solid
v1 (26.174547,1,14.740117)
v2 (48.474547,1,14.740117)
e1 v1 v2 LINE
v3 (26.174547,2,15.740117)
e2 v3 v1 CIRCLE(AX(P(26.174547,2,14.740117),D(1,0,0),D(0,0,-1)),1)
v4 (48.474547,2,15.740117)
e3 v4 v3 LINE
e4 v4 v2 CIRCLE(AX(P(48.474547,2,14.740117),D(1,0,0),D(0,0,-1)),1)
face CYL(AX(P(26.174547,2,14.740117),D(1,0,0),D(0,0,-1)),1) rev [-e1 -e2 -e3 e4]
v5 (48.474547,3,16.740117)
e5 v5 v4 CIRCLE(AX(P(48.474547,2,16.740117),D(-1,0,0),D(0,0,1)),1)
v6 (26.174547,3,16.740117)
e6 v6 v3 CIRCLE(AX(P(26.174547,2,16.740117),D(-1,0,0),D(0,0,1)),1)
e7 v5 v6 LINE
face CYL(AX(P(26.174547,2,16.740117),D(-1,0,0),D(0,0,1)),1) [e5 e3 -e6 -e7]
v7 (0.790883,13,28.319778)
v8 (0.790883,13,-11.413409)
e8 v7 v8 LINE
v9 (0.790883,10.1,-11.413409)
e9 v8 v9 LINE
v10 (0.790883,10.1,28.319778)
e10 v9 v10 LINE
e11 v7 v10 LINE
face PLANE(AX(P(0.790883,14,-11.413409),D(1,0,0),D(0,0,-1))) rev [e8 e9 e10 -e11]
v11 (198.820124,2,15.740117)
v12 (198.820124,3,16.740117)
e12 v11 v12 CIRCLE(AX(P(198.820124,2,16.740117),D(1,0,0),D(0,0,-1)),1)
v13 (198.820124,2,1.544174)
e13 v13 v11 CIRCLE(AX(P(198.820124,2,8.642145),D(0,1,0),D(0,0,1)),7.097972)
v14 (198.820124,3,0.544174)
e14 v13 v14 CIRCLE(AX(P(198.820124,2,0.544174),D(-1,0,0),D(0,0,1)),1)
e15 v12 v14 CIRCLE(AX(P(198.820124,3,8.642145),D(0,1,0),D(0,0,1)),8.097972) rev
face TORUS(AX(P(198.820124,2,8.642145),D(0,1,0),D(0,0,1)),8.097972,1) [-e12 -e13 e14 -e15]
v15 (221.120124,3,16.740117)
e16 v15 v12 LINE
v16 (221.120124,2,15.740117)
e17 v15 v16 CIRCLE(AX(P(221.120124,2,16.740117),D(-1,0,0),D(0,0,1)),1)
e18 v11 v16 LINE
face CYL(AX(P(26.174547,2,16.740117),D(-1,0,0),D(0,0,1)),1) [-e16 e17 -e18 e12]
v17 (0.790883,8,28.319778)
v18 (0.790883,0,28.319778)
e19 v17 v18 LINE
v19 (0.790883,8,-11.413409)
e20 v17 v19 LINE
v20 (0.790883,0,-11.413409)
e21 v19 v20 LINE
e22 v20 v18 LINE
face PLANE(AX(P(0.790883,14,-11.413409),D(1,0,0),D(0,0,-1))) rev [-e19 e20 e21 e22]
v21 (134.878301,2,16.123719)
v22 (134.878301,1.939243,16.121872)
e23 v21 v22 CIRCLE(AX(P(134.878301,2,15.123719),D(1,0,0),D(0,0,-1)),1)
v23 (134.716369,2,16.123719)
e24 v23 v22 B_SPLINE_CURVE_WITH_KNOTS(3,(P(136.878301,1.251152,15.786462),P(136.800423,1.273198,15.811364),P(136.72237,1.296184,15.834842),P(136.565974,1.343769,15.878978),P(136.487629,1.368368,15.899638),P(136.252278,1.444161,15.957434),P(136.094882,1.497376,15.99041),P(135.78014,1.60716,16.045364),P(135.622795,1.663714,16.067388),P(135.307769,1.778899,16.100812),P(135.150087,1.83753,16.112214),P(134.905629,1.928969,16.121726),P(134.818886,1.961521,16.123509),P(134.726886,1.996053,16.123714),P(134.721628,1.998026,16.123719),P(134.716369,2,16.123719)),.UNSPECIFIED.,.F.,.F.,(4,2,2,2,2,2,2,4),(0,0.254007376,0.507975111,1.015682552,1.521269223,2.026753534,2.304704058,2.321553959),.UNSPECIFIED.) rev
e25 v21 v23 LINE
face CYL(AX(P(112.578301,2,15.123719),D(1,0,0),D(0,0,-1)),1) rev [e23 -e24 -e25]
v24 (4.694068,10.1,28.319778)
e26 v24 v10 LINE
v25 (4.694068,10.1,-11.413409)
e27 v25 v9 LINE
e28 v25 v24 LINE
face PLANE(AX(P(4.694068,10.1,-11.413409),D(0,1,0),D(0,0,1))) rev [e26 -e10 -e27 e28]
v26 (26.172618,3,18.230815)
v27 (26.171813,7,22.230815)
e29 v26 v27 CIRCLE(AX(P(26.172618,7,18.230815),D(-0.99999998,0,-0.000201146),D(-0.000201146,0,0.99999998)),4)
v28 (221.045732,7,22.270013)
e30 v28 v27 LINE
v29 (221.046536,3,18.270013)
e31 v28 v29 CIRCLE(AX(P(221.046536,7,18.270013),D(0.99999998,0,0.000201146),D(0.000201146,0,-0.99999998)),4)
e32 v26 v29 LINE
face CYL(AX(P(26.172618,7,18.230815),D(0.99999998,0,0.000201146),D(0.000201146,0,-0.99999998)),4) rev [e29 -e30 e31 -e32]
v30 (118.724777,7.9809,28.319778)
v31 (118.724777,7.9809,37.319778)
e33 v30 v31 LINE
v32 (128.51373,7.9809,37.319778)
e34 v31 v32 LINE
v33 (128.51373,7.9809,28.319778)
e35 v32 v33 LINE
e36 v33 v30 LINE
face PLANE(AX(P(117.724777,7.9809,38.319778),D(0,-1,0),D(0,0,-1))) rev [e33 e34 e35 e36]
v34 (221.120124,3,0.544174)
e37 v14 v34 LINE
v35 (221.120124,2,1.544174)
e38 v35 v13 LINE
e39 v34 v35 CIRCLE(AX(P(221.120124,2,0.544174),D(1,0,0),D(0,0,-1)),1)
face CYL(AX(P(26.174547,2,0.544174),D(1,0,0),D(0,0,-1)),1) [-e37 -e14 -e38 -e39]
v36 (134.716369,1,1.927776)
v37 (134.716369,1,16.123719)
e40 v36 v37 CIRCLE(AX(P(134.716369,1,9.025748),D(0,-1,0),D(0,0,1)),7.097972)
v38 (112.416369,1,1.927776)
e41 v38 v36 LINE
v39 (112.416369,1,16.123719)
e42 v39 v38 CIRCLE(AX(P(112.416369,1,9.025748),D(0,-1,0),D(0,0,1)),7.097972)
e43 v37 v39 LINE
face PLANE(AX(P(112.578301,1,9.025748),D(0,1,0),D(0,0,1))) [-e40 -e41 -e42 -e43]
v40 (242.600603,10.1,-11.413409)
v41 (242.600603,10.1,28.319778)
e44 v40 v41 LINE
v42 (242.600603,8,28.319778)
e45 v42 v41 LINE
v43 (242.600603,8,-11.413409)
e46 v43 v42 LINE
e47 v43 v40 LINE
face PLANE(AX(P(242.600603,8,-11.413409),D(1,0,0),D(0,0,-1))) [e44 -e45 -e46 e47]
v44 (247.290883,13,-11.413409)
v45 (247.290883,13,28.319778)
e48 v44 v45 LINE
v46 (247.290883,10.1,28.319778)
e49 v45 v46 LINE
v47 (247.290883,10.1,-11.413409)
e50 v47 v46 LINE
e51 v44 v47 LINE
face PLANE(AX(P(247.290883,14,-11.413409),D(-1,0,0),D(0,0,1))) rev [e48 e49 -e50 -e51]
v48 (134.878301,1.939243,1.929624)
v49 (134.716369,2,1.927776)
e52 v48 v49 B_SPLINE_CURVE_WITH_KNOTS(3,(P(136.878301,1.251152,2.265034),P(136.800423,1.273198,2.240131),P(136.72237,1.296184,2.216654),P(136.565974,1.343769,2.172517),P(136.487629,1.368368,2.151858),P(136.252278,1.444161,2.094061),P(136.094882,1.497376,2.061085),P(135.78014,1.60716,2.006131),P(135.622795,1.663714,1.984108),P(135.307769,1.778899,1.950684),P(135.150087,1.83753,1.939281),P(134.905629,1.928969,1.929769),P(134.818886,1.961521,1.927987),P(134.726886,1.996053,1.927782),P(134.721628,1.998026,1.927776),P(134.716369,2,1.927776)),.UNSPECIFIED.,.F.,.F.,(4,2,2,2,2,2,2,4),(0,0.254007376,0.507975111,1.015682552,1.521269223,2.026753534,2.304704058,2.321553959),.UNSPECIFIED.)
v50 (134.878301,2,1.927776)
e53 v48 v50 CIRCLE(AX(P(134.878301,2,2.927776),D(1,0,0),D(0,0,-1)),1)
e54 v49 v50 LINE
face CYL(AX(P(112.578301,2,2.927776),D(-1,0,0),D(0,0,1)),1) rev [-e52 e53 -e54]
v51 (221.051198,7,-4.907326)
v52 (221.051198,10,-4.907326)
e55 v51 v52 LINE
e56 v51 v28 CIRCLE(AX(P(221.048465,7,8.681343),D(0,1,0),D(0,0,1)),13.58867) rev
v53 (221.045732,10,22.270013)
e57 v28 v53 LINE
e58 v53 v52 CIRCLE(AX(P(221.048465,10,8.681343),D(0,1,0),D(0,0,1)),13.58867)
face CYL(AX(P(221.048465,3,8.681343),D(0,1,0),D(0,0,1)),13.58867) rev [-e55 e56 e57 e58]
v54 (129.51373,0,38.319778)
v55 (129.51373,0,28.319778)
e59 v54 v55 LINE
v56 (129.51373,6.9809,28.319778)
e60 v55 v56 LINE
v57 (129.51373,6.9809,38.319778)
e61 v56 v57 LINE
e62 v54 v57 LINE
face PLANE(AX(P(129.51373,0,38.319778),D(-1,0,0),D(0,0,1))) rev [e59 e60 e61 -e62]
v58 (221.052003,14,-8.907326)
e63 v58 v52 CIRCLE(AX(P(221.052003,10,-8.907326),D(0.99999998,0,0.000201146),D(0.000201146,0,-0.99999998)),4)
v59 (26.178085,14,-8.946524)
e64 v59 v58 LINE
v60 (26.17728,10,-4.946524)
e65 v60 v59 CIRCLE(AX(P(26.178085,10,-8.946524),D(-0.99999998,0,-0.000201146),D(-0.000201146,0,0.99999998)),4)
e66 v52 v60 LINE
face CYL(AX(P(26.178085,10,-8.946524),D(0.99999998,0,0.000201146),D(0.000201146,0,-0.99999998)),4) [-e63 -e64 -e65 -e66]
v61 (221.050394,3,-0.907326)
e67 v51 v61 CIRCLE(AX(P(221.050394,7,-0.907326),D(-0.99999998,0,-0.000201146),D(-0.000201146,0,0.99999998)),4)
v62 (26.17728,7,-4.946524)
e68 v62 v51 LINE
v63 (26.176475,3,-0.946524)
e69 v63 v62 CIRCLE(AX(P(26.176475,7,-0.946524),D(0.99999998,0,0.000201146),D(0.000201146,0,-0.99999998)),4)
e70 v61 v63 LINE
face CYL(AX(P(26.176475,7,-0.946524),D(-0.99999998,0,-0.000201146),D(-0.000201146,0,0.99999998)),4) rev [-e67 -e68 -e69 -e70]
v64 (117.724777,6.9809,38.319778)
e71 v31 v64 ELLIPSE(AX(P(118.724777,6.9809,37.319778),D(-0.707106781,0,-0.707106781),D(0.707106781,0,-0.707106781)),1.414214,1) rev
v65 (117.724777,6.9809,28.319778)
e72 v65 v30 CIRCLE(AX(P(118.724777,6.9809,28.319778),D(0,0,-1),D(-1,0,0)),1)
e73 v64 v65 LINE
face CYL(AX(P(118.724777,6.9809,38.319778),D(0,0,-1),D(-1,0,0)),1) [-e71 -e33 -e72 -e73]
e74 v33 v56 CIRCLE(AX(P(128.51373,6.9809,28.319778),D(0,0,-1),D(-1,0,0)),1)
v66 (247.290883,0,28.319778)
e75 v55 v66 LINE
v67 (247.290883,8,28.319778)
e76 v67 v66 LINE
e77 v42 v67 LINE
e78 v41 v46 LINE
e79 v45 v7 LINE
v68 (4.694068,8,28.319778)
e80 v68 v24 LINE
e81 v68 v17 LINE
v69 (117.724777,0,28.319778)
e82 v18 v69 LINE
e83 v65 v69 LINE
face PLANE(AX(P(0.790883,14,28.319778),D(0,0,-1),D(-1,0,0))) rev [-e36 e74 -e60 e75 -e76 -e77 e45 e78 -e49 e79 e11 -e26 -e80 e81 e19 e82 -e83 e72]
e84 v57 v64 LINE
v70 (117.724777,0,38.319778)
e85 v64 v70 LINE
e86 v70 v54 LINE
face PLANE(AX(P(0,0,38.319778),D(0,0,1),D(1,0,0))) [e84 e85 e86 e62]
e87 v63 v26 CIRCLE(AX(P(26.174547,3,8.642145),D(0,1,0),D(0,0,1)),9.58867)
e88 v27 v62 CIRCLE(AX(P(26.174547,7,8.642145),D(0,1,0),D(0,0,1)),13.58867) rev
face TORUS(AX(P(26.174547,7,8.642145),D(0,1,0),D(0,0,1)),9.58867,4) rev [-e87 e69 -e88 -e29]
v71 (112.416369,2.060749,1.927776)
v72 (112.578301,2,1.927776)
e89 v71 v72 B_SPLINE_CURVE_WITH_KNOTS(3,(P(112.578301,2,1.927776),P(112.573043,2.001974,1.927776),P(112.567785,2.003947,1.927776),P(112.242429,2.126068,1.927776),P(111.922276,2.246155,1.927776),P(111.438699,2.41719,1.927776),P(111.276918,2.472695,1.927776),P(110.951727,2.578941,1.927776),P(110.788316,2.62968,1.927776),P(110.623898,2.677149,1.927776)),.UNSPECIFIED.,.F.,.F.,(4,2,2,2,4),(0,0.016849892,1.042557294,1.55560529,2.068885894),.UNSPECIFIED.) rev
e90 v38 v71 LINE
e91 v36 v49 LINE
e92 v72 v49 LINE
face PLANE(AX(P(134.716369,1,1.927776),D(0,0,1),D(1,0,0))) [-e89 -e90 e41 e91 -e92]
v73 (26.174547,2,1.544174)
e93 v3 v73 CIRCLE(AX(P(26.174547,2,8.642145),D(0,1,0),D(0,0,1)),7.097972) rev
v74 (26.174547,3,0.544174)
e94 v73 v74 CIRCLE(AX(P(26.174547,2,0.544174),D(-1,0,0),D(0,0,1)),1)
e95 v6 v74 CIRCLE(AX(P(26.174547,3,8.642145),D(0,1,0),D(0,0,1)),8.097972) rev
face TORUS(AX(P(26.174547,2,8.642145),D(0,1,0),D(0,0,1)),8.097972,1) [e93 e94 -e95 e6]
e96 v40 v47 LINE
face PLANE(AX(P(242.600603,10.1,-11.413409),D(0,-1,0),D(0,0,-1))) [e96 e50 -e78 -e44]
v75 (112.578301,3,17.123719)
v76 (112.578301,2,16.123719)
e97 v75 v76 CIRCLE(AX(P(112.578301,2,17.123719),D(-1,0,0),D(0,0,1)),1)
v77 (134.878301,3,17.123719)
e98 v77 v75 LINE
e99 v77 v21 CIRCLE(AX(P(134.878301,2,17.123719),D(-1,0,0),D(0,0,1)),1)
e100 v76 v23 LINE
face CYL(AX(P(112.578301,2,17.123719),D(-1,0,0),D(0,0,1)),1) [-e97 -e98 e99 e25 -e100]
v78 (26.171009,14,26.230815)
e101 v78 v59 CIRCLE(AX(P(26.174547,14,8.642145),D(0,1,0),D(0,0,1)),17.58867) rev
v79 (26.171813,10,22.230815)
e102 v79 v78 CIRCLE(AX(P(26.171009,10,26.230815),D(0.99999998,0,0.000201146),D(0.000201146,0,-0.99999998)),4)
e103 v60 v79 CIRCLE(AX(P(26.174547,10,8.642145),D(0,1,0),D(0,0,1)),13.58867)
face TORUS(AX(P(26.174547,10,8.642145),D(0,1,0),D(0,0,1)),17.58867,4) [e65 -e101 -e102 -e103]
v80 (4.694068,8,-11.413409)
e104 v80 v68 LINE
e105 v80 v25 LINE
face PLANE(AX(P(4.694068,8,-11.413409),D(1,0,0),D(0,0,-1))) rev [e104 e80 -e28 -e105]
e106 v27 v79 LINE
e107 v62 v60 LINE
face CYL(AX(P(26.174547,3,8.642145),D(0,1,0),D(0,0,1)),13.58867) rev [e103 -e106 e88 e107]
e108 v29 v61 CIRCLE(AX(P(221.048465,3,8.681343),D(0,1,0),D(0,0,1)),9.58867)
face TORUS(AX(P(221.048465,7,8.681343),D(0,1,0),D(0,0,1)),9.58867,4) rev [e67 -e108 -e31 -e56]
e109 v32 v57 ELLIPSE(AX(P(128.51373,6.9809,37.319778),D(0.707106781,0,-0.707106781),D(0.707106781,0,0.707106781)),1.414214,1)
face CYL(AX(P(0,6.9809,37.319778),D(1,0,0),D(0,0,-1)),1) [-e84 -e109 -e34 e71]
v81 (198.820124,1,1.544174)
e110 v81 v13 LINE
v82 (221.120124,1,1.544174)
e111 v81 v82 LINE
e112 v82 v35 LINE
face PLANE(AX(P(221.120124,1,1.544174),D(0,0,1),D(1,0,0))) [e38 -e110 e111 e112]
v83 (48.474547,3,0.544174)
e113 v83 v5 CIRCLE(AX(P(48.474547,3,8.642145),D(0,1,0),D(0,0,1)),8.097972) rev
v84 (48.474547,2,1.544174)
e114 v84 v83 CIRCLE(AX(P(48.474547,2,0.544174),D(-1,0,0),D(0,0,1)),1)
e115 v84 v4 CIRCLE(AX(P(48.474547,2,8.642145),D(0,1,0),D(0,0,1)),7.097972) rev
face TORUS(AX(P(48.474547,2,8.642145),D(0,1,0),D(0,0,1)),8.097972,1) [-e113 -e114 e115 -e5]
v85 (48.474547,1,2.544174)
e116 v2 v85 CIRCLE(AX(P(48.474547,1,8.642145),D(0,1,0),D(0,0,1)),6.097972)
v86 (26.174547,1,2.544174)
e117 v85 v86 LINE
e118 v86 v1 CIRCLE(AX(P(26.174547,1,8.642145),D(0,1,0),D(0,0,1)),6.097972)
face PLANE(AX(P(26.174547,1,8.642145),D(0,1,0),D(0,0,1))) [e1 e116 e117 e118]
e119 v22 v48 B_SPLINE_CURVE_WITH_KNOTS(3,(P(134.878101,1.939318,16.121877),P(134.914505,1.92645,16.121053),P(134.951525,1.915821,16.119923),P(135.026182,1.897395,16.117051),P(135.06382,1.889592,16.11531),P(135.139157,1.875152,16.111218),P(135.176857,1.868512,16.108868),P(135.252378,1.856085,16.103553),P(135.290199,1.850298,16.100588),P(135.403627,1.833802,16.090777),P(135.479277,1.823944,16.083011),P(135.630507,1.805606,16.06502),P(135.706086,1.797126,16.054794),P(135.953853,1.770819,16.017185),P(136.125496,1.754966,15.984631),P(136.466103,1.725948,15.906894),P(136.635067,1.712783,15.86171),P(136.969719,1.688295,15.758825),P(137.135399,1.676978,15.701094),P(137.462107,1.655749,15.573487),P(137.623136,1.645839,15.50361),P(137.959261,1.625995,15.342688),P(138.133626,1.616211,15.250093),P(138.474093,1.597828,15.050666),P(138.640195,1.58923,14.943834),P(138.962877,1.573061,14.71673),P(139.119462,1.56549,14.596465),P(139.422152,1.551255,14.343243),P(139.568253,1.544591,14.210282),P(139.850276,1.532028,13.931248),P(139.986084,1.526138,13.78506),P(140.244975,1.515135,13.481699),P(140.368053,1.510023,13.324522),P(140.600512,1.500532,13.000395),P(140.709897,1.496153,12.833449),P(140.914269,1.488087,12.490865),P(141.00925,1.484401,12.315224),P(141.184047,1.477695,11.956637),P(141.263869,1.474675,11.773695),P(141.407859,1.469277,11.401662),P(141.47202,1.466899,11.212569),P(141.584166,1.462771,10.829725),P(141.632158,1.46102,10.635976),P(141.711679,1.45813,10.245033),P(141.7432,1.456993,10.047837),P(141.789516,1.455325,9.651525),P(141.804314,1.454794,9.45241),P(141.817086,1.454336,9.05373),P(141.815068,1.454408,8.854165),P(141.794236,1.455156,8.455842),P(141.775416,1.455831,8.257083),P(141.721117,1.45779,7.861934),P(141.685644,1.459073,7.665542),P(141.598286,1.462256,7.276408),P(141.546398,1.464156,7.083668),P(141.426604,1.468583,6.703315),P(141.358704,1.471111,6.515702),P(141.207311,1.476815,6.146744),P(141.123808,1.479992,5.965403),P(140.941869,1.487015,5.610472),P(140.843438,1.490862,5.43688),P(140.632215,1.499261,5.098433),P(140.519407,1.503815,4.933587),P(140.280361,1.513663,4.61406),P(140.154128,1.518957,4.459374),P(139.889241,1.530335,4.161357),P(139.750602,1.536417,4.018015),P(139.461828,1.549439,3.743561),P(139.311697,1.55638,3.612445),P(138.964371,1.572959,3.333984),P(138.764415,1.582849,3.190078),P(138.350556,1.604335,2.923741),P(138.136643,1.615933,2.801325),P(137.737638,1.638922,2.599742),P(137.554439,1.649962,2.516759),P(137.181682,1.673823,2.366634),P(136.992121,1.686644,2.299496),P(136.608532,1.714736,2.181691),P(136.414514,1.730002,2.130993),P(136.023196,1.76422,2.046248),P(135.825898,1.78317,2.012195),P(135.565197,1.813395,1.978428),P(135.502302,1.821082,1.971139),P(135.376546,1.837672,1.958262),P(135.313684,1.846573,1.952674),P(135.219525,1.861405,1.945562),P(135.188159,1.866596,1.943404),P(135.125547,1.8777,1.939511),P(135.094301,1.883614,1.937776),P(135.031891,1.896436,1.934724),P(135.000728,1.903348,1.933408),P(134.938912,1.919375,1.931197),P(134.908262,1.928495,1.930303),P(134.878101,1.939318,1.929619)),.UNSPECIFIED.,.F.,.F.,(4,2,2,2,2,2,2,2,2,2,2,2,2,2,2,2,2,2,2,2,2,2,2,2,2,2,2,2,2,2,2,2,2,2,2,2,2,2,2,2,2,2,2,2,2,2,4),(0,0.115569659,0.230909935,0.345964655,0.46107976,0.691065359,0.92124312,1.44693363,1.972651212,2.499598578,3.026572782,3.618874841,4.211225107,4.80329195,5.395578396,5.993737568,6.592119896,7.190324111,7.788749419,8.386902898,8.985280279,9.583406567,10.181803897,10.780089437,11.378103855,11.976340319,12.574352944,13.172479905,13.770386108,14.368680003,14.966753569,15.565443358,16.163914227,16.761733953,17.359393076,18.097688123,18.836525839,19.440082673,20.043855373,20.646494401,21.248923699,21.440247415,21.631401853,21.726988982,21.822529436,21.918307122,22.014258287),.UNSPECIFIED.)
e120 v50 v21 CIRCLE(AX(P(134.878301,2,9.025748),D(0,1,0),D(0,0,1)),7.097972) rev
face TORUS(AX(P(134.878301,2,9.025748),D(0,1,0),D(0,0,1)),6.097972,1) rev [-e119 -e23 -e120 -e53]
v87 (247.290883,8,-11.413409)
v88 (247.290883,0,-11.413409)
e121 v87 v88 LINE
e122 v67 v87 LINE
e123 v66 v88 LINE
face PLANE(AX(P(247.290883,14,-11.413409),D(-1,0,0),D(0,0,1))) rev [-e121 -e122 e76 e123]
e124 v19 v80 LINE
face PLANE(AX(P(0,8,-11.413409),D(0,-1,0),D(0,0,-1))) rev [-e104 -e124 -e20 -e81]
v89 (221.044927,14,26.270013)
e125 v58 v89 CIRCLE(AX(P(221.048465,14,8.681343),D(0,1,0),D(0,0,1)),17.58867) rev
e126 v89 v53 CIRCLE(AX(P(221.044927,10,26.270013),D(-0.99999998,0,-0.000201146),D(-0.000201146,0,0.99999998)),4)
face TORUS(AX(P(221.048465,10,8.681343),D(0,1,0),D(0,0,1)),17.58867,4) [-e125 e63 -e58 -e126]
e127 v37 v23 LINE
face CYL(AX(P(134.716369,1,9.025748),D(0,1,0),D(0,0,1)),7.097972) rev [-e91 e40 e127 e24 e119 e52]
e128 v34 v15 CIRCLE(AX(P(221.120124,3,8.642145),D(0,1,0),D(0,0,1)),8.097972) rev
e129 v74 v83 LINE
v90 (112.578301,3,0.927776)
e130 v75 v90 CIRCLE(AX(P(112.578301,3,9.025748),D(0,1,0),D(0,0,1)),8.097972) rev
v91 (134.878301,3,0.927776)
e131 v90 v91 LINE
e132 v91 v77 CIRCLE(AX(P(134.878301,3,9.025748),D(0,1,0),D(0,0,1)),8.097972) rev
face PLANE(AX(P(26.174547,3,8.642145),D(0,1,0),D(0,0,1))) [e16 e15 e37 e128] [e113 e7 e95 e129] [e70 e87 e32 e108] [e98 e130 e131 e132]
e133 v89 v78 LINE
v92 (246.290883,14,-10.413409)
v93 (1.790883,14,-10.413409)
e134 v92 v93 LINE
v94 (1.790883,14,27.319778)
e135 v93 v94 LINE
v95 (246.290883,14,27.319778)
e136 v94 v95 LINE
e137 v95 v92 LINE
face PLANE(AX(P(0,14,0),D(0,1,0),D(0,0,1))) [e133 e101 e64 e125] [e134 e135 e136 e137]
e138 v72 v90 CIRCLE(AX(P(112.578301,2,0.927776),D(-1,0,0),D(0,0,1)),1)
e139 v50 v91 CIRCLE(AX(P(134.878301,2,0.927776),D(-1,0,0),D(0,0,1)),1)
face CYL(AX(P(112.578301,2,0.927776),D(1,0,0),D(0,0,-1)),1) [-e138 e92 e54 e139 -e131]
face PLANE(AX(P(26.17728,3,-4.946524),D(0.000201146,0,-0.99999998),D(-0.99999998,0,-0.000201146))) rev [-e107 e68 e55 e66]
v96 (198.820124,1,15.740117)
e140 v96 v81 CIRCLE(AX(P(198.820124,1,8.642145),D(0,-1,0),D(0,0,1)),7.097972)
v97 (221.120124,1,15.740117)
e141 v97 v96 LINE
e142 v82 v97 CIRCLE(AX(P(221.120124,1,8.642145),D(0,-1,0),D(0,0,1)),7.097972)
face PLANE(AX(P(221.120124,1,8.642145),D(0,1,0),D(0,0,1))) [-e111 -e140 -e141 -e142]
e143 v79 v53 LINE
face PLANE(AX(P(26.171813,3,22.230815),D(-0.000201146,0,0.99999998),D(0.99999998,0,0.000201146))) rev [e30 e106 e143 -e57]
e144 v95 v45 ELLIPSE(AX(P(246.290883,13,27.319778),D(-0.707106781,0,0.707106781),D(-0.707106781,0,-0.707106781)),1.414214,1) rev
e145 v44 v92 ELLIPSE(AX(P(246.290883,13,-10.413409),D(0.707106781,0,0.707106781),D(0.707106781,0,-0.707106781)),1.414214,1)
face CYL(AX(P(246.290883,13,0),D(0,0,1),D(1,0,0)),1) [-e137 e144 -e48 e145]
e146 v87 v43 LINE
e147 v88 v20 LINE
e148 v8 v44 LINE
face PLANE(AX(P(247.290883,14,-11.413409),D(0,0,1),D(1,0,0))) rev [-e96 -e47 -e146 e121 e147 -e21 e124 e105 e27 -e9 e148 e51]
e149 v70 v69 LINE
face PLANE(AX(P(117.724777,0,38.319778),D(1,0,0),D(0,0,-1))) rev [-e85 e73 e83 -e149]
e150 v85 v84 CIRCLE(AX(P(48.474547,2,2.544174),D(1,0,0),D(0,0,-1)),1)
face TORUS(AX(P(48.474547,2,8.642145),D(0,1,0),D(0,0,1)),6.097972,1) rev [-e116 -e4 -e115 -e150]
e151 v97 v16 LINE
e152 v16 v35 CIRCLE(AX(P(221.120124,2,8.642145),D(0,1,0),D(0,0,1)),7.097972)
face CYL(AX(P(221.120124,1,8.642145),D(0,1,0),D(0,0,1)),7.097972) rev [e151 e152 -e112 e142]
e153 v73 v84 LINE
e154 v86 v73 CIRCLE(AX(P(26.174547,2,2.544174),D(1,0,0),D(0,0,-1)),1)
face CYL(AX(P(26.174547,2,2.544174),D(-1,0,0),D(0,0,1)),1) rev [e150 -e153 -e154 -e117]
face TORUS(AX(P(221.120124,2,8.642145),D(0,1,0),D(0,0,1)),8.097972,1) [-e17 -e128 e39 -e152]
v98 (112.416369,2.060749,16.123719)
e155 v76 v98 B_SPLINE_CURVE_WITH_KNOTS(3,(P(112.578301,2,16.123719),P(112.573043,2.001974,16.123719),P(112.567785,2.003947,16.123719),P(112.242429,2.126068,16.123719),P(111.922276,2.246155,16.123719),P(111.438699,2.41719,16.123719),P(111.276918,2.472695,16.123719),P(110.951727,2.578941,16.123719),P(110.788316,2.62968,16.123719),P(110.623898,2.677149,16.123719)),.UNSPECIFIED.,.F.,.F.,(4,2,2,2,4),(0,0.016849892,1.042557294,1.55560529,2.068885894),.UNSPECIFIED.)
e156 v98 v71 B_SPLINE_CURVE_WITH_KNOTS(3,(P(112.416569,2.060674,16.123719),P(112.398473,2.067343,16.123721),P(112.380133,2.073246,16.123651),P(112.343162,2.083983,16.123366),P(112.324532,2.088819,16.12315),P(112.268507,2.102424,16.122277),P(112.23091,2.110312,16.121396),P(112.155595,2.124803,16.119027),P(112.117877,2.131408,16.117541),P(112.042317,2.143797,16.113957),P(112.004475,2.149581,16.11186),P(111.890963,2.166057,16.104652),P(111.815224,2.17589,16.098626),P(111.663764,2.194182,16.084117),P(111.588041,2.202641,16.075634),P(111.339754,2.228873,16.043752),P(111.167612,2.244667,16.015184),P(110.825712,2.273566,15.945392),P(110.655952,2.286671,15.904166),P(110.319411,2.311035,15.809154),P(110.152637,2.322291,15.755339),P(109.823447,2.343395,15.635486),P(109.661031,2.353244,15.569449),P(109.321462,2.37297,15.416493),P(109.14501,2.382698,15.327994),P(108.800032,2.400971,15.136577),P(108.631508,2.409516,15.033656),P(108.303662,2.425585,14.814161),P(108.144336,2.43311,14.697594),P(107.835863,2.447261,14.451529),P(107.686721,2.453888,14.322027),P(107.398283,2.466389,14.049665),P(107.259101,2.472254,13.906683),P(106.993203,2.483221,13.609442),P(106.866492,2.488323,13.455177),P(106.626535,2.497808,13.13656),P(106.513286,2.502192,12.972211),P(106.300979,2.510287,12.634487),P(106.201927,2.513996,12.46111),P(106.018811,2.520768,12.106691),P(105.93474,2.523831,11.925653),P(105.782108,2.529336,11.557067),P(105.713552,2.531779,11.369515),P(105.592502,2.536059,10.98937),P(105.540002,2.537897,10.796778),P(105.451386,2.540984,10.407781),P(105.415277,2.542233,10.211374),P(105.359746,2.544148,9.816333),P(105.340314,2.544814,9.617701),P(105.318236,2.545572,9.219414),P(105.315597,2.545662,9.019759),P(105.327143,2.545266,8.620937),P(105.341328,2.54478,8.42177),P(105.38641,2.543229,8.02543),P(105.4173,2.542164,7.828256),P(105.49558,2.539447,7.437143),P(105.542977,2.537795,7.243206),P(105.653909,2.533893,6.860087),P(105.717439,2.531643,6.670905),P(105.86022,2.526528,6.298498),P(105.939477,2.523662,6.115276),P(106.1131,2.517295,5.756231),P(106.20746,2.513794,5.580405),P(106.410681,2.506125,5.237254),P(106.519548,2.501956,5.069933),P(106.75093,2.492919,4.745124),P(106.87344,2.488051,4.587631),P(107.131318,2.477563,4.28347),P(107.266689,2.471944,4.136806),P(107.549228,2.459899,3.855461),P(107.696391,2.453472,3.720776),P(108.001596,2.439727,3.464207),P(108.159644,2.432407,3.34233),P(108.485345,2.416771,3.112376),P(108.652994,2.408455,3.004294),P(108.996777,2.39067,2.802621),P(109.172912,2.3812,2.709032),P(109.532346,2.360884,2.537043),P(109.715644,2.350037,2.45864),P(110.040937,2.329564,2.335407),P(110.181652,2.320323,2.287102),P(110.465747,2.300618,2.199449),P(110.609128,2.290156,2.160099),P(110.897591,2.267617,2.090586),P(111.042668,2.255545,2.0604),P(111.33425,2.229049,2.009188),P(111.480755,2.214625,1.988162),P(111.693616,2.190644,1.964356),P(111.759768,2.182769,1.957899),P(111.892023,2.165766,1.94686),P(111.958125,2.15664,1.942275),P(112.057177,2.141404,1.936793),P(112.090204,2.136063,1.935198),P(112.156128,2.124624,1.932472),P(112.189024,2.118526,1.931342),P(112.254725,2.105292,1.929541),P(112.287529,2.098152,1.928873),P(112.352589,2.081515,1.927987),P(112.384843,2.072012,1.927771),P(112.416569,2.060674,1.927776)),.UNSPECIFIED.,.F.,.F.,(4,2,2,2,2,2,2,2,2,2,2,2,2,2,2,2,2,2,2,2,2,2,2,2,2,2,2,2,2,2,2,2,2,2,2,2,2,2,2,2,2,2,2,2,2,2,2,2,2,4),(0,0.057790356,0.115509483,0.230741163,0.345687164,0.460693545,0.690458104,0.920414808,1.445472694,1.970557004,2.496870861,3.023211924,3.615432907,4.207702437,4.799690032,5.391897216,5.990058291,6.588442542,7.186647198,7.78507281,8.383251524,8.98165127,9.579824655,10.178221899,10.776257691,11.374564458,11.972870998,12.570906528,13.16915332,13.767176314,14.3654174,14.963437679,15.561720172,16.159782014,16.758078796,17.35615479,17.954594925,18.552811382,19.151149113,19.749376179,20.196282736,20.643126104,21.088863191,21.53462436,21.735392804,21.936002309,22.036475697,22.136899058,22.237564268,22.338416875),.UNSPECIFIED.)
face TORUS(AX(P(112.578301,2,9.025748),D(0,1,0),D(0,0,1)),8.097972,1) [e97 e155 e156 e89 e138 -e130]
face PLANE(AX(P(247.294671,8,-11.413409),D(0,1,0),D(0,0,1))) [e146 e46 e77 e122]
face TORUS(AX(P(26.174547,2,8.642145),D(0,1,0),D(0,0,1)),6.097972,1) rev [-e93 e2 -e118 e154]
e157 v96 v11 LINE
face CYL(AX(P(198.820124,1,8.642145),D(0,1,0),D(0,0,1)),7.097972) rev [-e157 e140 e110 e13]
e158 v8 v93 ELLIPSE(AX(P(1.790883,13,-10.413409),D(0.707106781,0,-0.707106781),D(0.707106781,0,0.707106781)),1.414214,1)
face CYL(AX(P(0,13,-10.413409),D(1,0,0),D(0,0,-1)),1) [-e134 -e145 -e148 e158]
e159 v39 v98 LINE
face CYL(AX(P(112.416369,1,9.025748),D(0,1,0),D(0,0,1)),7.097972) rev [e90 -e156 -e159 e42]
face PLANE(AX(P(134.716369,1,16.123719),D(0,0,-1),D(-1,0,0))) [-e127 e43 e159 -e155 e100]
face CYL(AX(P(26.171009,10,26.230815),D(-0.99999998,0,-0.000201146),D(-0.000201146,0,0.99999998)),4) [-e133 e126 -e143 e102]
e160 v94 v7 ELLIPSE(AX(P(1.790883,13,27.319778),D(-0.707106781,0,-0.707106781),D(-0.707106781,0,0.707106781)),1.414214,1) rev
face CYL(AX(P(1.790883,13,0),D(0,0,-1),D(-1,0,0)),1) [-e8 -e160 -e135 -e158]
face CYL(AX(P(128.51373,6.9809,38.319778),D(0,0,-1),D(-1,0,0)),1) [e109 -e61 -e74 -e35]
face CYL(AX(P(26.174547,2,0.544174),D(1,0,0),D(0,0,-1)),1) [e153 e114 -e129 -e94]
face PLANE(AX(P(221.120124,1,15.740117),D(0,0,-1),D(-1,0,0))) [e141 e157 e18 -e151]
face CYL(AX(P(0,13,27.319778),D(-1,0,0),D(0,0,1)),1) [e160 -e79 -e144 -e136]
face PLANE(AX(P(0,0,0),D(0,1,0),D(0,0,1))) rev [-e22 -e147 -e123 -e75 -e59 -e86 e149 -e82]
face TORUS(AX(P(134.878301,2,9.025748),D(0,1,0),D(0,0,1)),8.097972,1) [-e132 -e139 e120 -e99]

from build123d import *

# Parameters (mm, degrees)
SKETCH1_W           = 246.5
SKETCH1_H           = 39.733186143
BOSS_EXTRUDE1_DEPTH = 14
SKETCH2_W           = 4.694067914
SKETCH2_H           = 2.1
CUT_EXTRUDE1_DEPTH  = 251.853556912
CUT_EXTRUDE3_DEPTH  = 11
FILLET2_R           = 4
CUT_EXTRUDE4_DEPTH  = 2
FILLET6_R           = 1
FILLET8_R           = 1
SKETCH7_W           = 11.788952715
SKETCH7_H           = 7.980899871
BOSS_EXTRUDE2_DEPTH = 10
FILLET7_R           = 1


with BuildPart() as part:
    # Sketch1 → Boss-Extrude1 (new body)
    with BuildSketch(Plane(origin=(0, 0, 0), x_dir=(1, 0, 0), z_dir=(0, 1, 0))):
        with Locations((124.040883242, -8.453184467)):
            Rectangle(SKETCH1_W, SKETCH1_H)
    extrude(amount=BOSS_EXTRUDE1_DEPTH)

    # Sketch2 → Cut-Extrude1 (cut, through all)
    with BuildSketch(Plane.XY.offset(28.319777539)):
        with Locations((2.347033957, 9.05)):
            Rectangle(SKETCH2_W, SKETCH2_H)
    cut_extrude1 = extrude(amount=-CUT_EXTRUDE1_DEPTH, mode=Mode.SUBTRACT)

    # Sketch5 → Cut-Extrude3 (cut)
    with BuildSketch(Plane(origin=(0, 14, 0), x_dir=(1, 0, 0), z_dir=(0, 1, 0))):
        with BuildLine():
            Line((26.177280041, 4.946524414), (221.051198354, 4.907326306))
            ThreePointArc((221.051198354, 4.907326306), (234.637134771, -8.684076724), (221.045731741, -22.270013142))
            Line((221.045731741, -22.270013142), (26.171813428, -22.230815033))
            ThreePointArc((26.171813428, -22.230815033), (12.585877011, -8.639412003), (26.177280041, 4.946524414))
        make_face()
    extrude(amount=-CUT_EXTRUDE3_DEPTH, mode=Mode.SUBTRACT)

    # Fillet2
    fillet2_edges = [part.edges().sort_by_distance(p)[0] for p in [
        (12.585877011, 3, 8.639412003),
        (123.614239198, 3, -4.92692536),
        (234.637134771, 3, 8.684076724),
        (123.608772585, 3, 22.250414087),
        (12.585877011, 14, 8.639412003),
        (123.608772585, 14, 22.250414087),
        (234.637134771, 14, 8.684076724),
        (123.614239198, 14, -4.92692536),
    ]]
    fillet(fillet2_edges, radius=FILLET2_R)

    # Sketch6 → Cut-Extrude4 (cut)
    with BuildSketch(Plane(origin=(0, 3, 0), x_dir=(1, 0, 0), z_dir=(0, 1, 0))):
        with BuildLine():
            Line((26.174546735, -1.544173788), (48.474546735, -1.544173788))
            ThreePointArc((48.474546735, -1.544173788), (55.572518256, -8.64214531), (48.474546735, -15.740116831))
            Line((48.474546735, -15.740116831), (26.174546735, -15.740116831))
            ThreePointArc((26.174546735, -15.740116831), (19.076575213, -8.64214531), (26.174546735, -1.544173788))
        make_face()
        with BuildLine():
            Line((112.578301419, -1.927776302), (134.878301419, -1.927776302))
            ThreePointArc((134.878301419, -1.927776302), (141.97627294, -9.025747823), (134.878301419, -16.123719344))
            Line((134.878301419, -16.123719344), (112.578301419, -16.123719344))
            ThreePointArc((112.578301419, -16.123719344), (105.480329898, -9.025747823), (112.578301419, -1.927776302))
        make_face()
    cut_extrude4 = extrude(amount=-CUT_EXTRUDE4_DEPTH, mode=Mode.SUBTRACT)

    # Fillet6
    fillet6_edges = [part.edges().sort_by_distance(p)[0] for p in [
        (19.076575213, 3, 8.64214531),
        (37.324546735, 3, 1.544173788),
        (55.572518256, 3, 8.64214531),
        (37.324546735, 3, 15.740116831),
        (37.324546735, 1, 1.544173788),
        (55.572518256, 1, 8.64214531),
        (37.324546735, 1, 15.740116831),
        (19.076575213, 1, 8.64214531),
        (105.480329898, 3, 9.025747823),
        (123.728301419, 3, 1.927776302),
        (141.97627294, 3, 9.025747823),
        (123.728301419, 3, 16.123719344),
        (123.728301419, 1, 1.927776302),
        (141.97627294, 1, 9.025747823),
        (123.728301419, 1, 16.123719344),
        (105.480329898, 1, 9.025747823),
    ]]
    fillet(fillet6_edges, radius=FILLET6_R - 0.0001)  # a hair under: the kernel refuses the full size

    # Mirror4: Cut-Extrude4 across plane
    add(cut_extrude4.mirror(Plane(origin=(123.647335387, 0, 0), x_dir=(0, 0, 1), z_dir=(1, 0, 0))), mode=Mode.SUBTRACT)

    # Fillet8
    fillet8_edges = [part.edges().sort_by_distance(p)[0] for p in [
        (228.218095561, 3, 8.64214531),
        (209.97012404, 3, 15.740116831),
        (191.722152519, 3, 8.64214531),
        (209.97012404, 3, 1.544173788),
    ]]
    fillet(fillet8_edges, radius=FILLET8_R)

    # Mirror5: Cut-Extrude1 across plane
    add(cut_extrude1.mirror(Plane(origin=(123.647335387, 0, 0), x_dir=(0, 0, 1), z_dir=(1, 0, 0))), mode=Mode.SUBTRACT)

    # Sketch7 → Boss-Extrude2 (add)
    with BuildSketch(Plane.XY.offset(28.319777539)):
        with Locations((123.619253178, 3.990449936)):
            Rectangle(SKETCH7_W, SKETCH7_H)
    extrude(amount=BOSS_EXTRUDE2_DEPTH)

    # Fillet7
    fillet7_edges = [part.edges().sort_by_distance(p)[0] for p in [
        (0.790883242, 14, 8.453184468),
        (124.040883242, 14, 28.319777539),
        (129.513729535, 7.980899871, 33.319777539),
        (117.72477682, 7.980899871, 33.319777539),
        (123.619253178, 7.980899871, 38.319777539),
        (247.290883242, 14, 8.453184468),
        (124.040883242, 14, -11.413408604),
    ]]
    fillet(fillet7_edges, radius=FILLET7_R)


solid = part.part
